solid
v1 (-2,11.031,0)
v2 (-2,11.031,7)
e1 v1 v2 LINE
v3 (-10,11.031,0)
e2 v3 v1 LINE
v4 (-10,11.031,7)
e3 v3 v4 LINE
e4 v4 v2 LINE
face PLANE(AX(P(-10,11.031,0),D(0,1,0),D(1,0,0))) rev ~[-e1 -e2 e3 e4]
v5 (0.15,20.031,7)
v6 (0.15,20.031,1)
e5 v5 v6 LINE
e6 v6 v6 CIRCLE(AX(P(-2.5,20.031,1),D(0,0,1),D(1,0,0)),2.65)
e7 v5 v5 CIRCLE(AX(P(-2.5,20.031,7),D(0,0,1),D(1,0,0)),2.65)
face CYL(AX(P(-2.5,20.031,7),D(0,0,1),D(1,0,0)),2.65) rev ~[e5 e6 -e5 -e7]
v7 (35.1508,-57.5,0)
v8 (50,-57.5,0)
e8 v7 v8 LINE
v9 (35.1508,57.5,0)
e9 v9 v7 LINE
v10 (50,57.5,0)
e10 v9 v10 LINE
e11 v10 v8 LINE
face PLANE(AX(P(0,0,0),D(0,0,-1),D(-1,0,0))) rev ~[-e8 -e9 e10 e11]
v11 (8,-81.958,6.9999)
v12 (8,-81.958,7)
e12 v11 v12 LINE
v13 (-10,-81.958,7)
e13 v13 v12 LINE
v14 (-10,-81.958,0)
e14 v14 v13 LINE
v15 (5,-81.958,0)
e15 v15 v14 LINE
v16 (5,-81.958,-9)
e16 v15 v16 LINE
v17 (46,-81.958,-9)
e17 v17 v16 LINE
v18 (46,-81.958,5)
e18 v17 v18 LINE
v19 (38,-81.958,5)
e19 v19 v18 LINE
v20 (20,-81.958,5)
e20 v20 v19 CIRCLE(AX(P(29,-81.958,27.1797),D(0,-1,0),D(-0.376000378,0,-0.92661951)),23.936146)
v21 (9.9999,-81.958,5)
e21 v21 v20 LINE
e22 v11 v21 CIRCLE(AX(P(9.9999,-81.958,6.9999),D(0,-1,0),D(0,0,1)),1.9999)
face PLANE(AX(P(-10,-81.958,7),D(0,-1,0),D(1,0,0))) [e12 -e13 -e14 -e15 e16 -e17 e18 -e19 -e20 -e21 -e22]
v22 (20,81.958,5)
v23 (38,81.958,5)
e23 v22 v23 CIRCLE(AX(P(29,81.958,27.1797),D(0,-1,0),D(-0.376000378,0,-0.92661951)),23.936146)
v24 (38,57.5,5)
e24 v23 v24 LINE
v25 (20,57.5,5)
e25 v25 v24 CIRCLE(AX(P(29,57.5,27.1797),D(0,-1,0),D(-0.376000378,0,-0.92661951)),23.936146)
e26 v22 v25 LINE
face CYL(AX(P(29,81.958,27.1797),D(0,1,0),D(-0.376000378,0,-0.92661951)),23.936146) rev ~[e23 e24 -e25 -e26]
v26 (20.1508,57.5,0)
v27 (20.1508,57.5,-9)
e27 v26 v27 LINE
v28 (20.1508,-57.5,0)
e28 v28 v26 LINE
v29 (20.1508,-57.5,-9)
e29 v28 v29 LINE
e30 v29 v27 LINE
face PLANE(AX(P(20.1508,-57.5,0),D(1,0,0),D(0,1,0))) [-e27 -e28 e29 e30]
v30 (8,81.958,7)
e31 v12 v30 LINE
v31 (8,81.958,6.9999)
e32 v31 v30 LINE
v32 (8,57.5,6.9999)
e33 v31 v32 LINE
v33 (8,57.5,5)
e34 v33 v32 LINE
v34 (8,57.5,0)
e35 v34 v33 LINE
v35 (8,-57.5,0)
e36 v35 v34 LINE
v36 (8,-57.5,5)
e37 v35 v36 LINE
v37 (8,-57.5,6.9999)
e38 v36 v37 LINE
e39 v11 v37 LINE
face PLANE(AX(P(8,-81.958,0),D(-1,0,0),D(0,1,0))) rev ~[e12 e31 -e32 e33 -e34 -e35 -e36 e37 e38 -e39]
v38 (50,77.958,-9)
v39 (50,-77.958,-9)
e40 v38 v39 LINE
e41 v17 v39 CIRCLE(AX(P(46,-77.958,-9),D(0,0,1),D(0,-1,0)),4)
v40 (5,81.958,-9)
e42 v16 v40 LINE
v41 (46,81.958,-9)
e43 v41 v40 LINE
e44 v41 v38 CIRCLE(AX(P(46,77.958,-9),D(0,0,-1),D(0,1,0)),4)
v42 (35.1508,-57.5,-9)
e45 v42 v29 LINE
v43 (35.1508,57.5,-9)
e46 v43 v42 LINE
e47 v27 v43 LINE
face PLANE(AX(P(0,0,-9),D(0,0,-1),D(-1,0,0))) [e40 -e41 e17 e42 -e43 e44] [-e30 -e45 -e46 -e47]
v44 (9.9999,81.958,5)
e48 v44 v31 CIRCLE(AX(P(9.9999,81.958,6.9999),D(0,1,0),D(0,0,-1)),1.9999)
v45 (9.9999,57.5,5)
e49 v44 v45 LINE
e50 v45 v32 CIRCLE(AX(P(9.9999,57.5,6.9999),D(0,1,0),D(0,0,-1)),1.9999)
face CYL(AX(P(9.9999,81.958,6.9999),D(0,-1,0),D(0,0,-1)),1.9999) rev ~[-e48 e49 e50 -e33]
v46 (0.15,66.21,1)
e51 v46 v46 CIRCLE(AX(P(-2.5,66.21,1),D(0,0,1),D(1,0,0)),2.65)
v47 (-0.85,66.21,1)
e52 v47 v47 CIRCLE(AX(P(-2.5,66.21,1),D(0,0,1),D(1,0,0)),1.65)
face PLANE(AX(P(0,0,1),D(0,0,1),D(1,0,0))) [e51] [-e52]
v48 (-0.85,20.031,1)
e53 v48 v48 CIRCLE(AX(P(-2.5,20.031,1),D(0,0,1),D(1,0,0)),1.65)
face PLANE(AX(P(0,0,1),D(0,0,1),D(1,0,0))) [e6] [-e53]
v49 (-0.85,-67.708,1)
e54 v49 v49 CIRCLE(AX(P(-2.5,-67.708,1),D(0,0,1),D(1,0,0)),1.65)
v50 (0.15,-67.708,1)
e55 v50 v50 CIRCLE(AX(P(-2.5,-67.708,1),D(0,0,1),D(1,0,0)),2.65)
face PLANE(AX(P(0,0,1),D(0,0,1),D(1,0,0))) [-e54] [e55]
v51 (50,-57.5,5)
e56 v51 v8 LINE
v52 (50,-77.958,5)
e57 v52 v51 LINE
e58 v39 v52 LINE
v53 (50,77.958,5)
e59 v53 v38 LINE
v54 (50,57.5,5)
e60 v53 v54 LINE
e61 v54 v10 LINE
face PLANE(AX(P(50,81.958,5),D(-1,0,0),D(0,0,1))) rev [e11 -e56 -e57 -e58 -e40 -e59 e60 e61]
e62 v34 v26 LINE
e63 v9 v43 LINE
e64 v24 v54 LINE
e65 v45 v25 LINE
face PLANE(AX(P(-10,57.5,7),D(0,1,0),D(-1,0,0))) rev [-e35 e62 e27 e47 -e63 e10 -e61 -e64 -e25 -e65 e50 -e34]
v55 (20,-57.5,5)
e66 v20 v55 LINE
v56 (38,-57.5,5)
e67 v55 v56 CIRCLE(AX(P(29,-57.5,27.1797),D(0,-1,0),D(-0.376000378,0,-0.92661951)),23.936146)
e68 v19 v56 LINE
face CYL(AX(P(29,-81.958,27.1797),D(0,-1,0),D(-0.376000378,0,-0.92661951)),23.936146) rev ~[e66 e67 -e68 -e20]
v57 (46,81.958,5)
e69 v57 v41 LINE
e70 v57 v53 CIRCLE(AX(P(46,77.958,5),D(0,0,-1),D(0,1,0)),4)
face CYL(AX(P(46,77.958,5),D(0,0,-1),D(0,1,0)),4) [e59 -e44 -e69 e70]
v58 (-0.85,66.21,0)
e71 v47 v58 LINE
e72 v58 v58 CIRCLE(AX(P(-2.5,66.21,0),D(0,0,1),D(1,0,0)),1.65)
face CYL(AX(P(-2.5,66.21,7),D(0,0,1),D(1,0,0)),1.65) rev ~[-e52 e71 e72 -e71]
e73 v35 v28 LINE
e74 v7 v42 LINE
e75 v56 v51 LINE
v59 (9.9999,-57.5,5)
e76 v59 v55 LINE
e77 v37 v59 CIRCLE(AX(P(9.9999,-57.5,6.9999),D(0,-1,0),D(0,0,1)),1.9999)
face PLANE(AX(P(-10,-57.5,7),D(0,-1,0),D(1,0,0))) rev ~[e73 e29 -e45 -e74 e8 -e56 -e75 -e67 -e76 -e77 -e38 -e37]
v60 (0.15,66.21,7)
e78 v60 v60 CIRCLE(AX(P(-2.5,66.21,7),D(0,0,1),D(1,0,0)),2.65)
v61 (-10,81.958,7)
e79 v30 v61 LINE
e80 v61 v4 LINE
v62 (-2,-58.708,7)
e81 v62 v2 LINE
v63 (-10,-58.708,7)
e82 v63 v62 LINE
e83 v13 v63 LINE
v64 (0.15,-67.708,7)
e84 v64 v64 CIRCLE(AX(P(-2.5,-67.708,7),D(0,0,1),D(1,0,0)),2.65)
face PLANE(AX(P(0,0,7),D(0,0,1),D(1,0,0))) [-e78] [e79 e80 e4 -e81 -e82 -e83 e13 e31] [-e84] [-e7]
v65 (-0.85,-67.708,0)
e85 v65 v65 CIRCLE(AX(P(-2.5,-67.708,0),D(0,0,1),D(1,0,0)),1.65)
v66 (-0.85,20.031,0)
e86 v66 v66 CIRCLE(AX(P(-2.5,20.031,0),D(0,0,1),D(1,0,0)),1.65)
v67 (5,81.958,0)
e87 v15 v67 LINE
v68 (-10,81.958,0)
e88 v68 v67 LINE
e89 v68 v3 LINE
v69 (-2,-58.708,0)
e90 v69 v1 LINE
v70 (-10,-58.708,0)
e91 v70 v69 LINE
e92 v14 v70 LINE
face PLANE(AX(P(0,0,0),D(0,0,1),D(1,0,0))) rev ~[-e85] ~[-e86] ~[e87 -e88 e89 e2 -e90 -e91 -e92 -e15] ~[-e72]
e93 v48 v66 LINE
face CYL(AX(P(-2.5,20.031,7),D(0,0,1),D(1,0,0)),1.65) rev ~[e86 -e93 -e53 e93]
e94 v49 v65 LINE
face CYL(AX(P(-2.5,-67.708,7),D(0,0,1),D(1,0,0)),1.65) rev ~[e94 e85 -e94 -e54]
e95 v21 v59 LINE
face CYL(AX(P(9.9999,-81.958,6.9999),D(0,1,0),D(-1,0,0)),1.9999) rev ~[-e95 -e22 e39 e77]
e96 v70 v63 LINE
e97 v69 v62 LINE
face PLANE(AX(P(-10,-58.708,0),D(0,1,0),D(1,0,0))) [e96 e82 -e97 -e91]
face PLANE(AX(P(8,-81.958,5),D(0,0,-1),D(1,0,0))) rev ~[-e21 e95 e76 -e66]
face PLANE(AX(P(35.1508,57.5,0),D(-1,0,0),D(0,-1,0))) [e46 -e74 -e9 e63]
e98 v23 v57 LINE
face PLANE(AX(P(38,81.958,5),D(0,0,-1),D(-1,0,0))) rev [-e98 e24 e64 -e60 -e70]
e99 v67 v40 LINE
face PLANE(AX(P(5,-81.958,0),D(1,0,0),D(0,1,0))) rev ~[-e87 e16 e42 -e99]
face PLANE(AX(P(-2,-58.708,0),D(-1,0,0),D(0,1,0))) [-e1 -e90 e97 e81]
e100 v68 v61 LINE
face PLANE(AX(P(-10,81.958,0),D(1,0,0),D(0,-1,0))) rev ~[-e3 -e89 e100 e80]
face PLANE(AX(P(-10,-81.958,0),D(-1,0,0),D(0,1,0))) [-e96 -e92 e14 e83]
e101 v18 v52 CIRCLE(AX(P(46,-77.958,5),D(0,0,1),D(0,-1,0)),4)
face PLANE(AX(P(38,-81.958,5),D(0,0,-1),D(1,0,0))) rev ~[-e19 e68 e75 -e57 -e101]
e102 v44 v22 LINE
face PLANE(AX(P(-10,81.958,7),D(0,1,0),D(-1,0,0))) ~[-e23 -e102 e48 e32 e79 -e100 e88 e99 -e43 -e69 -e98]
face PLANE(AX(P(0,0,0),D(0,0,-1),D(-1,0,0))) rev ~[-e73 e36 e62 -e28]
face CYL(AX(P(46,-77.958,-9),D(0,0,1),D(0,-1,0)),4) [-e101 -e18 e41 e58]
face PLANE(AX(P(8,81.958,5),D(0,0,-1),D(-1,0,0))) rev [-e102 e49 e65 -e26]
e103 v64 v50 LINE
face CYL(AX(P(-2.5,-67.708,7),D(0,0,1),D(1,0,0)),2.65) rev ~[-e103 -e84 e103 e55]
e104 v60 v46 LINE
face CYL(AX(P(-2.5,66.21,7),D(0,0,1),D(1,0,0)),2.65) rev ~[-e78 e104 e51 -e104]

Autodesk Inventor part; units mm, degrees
ref_plane "YZ Plane" through (0, 0, 0) normal (1, 0, 0) x (0, 1, 0)
ref_plane "XZ Plane" through (0, 0, 0) normal (0, 1, 0) x (-1, 0, 0)
ref_plane "XY Plane" through (0, 0, 0) normal (0, 0, 1) x (1, 0, 0)
sketch "Sketch1" plane through (0, 0, 0) normal (0, 0, 1) x (1, 0, 0)
  line L0 (0, 0) -> (0, 81.958)
  line L1 (0, 0) -> (0, -81.958)
  line L2 (0, -81.958) -> (-10, -81.958)
  line L3 (-5, -81.958) -> (-5, -67.708) construction
  line L4 (-5, -67.708) -> (-5, -58.708) construction
  line L5 (-10, -81.958) -> (-10, -58.708)
  line L6 (-10, -58.708) -> (0, -58.708)
  line L7 (0, 81.958) -> (-10, 81.958)
  line L8 (-5, 81.958) -> (-5, 66.21) construction
  line L9 (-5, 66.21) -> (-5, 20.031) construction
  line L10 (-5, 20.031) -> (-5, 11.031) construction
  line L11 (-10, 81.958) -> (-10, 11.031)
  line L12 (-10, 11.031) -> (0, 11.031)
  line L13 (0, -58.708) -> (-2, -58.708)
  line L14 (-2, -58.708) -> (-2, 11.031)
  line L15 (0, -81.958) -> (8, -81.958)
  line L16 (8, -81.958) -> (8, 81.958)
  line L17 (8, 81.958) -> (0, 81.958)
  line L18 (0, 81.958) -> (0, -81.958)
  dimension "d0" = 81.958
  dimension "d2" = 163.916
  dimension "d3" = 10
  dimension "d4" = 14.25
  dimension "d5" = 9
  dimension "d6" = 15.748
  dimension "d7" = 46.179
  dimension "d8" = 9
  dimension "d9" = 2
  dimension "d10" = 8
extrude "Extrusion1" add sketch "Sketch1" along normal blind 7
sketch "Sketch2" plane through (0, 0, 0) normal (0, 0, -1) x (-1, 0, 0)
  line L0 (10, 81.958) -> (10, 11.031) construction
  line L1 (10, 46.4945) -> (-5, 46.4945) construction
  line L2 (-50, 81.958) -> (-50, -81.958)
  line L3 (-35.1508, -57.5) -> (-20.1508, -57.5)
  line L4 (-20.1508, -57.5) -> (-20.1508, 57.5)
  line L5 (-20.1508, 57.5) -> (-35.1508, 57.5)
  line L6 (-35.1508, 57.5) -> (-35.1508, -57.5)
  line L7 (-35.1508, -57.5) -> (-20.1508, 57.5) construction
  line L8 (-20.1508, -57.5) -> (-35.1508, 57.5) construction
  line L9 (-5, -81.958) -> (-5, 81.958)
  line L10 (-50, -81.958) -> (-5, -81.958)
  line L11 (10, -81.958) -> (-8, -81.958) projected
  line L12 (-50, 81.958) -> (-5, 81.958)
  line L13 (-8, 81.958) -> (10, 81.958) projected
  point P0 (0, 0)
  point P1 (-27.6508, 0)
  dimension "d13" = 15
  dimension "d15" = 15
  dimension "d16" = 115
extrude "Extrusion2" add sketch "Sketch2" along normal blind 9
sketch "Sketch3" plane through (-10, -81.958, 7) normal (0, -1, 0) x (1, 0, 0)
  line L0 (18, -7) -> (60, -7) projected
  line L1 (60, -7) -> (18, -7)
  line L2 (18, -7) -> (18, -2)
  line L3 (18, -7) -> (18, 0) projected
  line L4 (18, -2) -> (60, -2)
  line L5 (60, -2) -> (60, -7)
  line L6 (18, -2) -> (30, -2) construction
  line L7 (60, -2) -> (48, -2) construction
  arc A0 (30, -2) -> (48, -2) centre (39, 20.1797) ccw
  dimension "d34" = 5
  dimension "d35" = 12
  dimension "d36" = 12
extrude "Extrusion3" add sketch "Sketch3" against normal up to surface (24.458 mm away) contours L2 L4 A0 L5 L0
mirror "Mirror1" about plane through (0, 0, 0) normal (0, 1, 0) of "Extrusion3"
sketch "Sketch4" plane through (0, 0, 7) normal (0, 0, 1) x (1, 0, 0)
  line L0 (-5, -81.958) -> (-5, -67.708) construction
  line L1 (-5, 81.958) -> (-5, 66.21) construction
  line L2 (-5, 66.21) -> (-5, 20.031) construction
  line L3 (-10, -58.708) -> (-10, -81.958) construction
  line L4 (-10, -70.333) -> (5, -70.333) construction
  line L5 (5, 81.958) -> (5, -81.958) construction
  circle A0 centre (-2.5, -67.708) radius 1.65
  circle A1 centre (-2.5, 20.031) radius 1.65
  circle A2 centre (-2.5, 66.21) radius 1.65
  point P0 (0, 0)
  dimension "d22" = 14.25
  dimension "d23" = 46.179
  dimension "d24" = 15.748
  dimension "d31" = 15
  dimension "d32" = 3.3
extrude "Extrusion4" cut sketch "Sketch4" against normal up to surface (7 mm away)
sketch "Sketch5" plane through (0, 0, 7) normal (0, 0, 1) x (1, 0, 0)
  circle A0 centre (-2.5, -67.708) radius 1.65 projected
  circle A1 centre (-2.5, -67.708) radius 2.65
  circle A2 centre (-2.5, 20.031) radius 1.65 projected
  circle A3 centre (-2.5, 20.031) radius 2.65
  circle A4 centre (-2.5, 66.21) radius 1.65 projected
  circle A5 centre (-2.5, 66.21) radius 2.65
  dimension "d33" = 5.3
extrude "Extrusion5" cut sketch "Sketch5" against normal blind 6 contours A0 | A1 | A2 | A3 | A4 | A5
fillet "Fillet1" radius 4 2 edges at (50, -81.958, -2) (50, 81.958, -2)
fillet "Fillet2" radius 2 2 edges at (8, -69.729, 5) (8, 69.729, 5)
properties part number "Base Extension 2"
